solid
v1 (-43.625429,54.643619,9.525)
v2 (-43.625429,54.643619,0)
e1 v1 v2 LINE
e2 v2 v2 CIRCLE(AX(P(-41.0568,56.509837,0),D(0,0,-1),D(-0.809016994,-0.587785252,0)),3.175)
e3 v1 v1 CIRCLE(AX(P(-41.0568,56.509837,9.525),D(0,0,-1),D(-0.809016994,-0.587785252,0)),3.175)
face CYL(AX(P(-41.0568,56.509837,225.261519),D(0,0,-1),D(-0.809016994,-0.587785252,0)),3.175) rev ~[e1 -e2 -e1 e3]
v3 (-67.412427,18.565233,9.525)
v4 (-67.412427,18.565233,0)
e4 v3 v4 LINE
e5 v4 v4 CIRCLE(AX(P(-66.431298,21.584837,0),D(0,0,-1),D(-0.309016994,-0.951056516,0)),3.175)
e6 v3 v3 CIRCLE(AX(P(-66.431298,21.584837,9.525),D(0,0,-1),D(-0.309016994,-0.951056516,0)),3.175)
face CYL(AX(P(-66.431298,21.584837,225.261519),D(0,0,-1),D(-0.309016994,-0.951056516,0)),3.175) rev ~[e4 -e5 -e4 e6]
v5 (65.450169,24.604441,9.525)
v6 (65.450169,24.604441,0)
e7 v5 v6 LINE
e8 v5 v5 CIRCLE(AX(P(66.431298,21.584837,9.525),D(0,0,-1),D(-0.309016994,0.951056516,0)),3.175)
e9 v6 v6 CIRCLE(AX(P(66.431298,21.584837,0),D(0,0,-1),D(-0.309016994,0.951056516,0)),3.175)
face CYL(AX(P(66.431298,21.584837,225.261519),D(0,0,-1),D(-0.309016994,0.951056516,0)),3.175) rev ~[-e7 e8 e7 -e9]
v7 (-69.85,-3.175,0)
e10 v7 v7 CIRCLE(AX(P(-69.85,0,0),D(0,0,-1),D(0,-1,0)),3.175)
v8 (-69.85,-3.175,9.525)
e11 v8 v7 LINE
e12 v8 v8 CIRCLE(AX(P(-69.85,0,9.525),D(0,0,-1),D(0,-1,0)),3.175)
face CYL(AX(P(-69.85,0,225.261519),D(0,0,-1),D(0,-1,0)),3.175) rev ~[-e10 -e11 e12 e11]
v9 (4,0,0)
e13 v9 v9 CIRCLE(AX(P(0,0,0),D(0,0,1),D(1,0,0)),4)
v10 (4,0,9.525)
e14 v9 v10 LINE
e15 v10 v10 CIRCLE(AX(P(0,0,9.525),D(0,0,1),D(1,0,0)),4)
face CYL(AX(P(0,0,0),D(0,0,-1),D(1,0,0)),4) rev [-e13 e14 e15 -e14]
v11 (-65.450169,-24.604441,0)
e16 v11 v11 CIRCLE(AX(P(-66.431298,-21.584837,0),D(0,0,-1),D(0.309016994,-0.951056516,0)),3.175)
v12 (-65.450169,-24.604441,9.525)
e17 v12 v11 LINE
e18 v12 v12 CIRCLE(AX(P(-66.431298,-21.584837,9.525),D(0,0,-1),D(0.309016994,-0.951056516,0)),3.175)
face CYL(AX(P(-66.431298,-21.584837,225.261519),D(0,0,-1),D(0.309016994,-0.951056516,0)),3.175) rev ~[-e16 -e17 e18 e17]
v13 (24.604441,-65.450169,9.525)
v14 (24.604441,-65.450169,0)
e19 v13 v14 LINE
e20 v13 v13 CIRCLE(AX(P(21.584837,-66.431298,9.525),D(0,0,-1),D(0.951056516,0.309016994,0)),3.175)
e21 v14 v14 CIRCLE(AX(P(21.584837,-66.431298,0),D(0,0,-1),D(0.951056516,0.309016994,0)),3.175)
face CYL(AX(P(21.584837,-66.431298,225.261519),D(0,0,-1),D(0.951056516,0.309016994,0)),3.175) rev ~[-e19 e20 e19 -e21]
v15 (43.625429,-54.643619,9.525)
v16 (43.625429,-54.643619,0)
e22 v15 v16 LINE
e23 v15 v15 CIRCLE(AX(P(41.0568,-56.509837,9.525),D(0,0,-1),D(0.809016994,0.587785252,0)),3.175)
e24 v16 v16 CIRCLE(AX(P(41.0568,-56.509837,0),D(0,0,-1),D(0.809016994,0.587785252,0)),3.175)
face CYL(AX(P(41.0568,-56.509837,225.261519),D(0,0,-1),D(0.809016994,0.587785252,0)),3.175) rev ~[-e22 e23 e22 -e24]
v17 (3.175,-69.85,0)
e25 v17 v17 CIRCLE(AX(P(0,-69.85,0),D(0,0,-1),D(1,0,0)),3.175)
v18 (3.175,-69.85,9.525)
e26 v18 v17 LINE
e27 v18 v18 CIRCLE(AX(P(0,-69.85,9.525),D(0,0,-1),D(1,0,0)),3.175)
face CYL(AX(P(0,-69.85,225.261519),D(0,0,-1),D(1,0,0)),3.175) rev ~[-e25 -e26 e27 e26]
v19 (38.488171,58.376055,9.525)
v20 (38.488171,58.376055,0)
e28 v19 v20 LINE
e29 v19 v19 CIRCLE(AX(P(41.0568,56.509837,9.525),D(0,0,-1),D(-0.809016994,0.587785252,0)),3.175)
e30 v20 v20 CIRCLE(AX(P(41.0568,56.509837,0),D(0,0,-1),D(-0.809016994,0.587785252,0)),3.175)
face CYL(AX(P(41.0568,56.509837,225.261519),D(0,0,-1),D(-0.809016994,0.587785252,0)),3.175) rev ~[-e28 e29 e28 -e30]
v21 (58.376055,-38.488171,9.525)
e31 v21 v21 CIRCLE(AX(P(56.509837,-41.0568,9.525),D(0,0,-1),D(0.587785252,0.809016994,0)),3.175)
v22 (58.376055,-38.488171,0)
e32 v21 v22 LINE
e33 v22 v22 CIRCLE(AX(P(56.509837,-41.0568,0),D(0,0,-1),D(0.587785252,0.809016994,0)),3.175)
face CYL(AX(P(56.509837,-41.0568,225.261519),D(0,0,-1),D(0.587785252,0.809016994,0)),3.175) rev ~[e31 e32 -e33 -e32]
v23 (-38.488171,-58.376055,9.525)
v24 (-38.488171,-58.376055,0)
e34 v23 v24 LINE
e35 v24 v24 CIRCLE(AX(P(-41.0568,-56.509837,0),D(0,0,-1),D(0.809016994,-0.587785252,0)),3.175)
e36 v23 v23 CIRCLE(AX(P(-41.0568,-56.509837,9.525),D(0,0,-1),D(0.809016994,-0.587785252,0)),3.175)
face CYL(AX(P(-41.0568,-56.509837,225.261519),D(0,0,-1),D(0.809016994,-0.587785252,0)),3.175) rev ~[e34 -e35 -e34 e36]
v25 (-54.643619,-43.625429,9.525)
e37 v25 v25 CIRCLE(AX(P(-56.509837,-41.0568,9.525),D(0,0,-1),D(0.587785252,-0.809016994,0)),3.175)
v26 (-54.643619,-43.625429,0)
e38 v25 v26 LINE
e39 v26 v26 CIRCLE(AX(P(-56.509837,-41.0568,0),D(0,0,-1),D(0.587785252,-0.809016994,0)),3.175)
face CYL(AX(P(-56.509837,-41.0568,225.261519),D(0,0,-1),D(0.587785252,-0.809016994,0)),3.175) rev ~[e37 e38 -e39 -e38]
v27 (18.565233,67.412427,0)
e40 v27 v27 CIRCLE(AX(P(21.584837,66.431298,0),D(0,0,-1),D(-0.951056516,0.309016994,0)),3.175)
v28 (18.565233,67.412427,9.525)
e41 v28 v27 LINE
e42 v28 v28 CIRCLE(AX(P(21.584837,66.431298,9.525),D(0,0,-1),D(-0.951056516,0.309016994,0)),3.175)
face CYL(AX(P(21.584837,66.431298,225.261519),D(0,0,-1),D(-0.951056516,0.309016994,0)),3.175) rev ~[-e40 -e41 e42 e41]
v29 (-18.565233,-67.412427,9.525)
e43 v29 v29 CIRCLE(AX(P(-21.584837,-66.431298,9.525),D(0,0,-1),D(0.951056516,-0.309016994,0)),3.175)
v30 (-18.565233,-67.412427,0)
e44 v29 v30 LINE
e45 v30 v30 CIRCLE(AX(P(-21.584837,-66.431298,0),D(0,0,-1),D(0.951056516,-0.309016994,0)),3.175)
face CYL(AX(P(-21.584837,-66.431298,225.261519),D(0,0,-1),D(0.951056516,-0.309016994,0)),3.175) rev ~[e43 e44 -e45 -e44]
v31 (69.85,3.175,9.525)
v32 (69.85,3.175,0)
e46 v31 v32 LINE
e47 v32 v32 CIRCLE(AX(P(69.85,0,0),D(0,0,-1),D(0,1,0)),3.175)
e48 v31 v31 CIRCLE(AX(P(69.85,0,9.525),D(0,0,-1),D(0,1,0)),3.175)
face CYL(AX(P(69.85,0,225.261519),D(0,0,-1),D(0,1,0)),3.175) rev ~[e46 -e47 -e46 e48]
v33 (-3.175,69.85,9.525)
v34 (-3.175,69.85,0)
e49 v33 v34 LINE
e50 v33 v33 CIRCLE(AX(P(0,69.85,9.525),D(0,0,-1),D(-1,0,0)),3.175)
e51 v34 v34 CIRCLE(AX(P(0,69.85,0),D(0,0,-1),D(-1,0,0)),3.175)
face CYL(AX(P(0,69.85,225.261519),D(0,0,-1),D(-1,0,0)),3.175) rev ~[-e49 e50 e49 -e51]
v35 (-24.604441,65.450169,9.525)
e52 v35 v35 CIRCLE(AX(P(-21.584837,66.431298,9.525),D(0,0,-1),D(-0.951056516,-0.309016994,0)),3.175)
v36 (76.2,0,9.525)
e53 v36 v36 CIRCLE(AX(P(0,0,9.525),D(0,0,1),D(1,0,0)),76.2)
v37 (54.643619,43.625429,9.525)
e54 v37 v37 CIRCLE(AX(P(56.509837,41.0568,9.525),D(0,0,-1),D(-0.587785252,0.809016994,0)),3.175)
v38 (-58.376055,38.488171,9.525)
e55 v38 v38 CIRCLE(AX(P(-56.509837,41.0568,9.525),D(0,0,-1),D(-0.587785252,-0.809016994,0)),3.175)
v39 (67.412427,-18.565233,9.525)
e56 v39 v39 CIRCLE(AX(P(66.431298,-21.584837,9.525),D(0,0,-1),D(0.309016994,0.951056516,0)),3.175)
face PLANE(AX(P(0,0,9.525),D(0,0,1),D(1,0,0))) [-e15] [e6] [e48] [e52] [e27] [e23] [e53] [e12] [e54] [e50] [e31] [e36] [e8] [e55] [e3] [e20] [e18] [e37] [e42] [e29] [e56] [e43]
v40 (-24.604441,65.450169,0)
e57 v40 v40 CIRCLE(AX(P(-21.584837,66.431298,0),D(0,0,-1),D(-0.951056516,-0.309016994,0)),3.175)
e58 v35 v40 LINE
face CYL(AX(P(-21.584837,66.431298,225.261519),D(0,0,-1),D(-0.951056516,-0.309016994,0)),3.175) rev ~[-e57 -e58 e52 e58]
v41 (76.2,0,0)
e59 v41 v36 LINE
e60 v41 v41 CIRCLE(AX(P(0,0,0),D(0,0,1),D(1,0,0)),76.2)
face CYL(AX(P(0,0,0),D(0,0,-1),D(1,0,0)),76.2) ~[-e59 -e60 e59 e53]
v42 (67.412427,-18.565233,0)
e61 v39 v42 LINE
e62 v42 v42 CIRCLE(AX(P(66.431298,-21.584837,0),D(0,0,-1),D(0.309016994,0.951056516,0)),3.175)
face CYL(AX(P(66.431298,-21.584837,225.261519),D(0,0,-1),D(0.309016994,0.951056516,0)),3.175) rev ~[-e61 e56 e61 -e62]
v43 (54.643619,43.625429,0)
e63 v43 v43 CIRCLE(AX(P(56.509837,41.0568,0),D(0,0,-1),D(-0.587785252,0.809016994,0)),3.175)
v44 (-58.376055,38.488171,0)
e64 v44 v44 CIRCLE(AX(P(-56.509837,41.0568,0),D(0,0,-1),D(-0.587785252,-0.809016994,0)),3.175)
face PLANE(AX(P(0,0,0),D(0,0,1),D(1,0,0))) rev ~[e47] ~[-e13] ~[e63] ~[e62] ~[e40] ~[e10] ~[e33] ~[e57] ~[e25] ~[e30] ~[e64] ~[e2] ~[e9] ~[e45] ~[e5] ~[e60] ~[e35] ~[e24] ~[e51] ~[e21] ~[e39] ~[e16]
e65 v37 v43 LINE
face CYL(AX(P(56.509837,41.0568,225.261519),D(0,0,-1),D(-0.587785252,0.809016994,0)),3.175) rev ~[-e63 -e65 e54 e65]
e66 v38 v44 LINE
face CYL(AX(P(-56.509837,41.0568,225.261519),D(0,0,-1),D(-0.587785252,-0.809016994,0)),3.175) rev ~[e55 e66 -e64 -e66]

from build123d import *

# Parameters (mm, degrees)
F0_R            = 76.2
F0_R_2          = 4
F1_DEPTH        = 9.525
F3_D            = 6.35
F3_COPIES_COUNT = 20


# Not quite as in the source:
# - a pattern or mirror of a feature is missing from the dataset's text; its kind, count and spacing are read off the source's solid


with BuildPart() as f1:
    # F0 (on Top) → F1 (new body)
    with BuildSketch(Plane.XY):
        Circle(F0_R)
        Circle(F0_R_2, mode=Mode.SUBTRACT)
    extrude(amount=F1_DEPTH)

    # F3 (through all)
    with Locations(Plane.XY.offset(9.525)):
        with Locations((0, 69.85)):
            f3 = Hole(F3_D / 2)

    # F3_copies: F3 ×20 about axis
    f3_copies_axis = Axis((0, 0, 0), (0, 0, 1))
    for i in range(1, F3_COPIES_COUNT):
        add(f3.rotate(f3_copies_axis, i * 360 / F3_COPIES_COUNT), mode=Mode.SUBTRACT)


solid = f1.part
